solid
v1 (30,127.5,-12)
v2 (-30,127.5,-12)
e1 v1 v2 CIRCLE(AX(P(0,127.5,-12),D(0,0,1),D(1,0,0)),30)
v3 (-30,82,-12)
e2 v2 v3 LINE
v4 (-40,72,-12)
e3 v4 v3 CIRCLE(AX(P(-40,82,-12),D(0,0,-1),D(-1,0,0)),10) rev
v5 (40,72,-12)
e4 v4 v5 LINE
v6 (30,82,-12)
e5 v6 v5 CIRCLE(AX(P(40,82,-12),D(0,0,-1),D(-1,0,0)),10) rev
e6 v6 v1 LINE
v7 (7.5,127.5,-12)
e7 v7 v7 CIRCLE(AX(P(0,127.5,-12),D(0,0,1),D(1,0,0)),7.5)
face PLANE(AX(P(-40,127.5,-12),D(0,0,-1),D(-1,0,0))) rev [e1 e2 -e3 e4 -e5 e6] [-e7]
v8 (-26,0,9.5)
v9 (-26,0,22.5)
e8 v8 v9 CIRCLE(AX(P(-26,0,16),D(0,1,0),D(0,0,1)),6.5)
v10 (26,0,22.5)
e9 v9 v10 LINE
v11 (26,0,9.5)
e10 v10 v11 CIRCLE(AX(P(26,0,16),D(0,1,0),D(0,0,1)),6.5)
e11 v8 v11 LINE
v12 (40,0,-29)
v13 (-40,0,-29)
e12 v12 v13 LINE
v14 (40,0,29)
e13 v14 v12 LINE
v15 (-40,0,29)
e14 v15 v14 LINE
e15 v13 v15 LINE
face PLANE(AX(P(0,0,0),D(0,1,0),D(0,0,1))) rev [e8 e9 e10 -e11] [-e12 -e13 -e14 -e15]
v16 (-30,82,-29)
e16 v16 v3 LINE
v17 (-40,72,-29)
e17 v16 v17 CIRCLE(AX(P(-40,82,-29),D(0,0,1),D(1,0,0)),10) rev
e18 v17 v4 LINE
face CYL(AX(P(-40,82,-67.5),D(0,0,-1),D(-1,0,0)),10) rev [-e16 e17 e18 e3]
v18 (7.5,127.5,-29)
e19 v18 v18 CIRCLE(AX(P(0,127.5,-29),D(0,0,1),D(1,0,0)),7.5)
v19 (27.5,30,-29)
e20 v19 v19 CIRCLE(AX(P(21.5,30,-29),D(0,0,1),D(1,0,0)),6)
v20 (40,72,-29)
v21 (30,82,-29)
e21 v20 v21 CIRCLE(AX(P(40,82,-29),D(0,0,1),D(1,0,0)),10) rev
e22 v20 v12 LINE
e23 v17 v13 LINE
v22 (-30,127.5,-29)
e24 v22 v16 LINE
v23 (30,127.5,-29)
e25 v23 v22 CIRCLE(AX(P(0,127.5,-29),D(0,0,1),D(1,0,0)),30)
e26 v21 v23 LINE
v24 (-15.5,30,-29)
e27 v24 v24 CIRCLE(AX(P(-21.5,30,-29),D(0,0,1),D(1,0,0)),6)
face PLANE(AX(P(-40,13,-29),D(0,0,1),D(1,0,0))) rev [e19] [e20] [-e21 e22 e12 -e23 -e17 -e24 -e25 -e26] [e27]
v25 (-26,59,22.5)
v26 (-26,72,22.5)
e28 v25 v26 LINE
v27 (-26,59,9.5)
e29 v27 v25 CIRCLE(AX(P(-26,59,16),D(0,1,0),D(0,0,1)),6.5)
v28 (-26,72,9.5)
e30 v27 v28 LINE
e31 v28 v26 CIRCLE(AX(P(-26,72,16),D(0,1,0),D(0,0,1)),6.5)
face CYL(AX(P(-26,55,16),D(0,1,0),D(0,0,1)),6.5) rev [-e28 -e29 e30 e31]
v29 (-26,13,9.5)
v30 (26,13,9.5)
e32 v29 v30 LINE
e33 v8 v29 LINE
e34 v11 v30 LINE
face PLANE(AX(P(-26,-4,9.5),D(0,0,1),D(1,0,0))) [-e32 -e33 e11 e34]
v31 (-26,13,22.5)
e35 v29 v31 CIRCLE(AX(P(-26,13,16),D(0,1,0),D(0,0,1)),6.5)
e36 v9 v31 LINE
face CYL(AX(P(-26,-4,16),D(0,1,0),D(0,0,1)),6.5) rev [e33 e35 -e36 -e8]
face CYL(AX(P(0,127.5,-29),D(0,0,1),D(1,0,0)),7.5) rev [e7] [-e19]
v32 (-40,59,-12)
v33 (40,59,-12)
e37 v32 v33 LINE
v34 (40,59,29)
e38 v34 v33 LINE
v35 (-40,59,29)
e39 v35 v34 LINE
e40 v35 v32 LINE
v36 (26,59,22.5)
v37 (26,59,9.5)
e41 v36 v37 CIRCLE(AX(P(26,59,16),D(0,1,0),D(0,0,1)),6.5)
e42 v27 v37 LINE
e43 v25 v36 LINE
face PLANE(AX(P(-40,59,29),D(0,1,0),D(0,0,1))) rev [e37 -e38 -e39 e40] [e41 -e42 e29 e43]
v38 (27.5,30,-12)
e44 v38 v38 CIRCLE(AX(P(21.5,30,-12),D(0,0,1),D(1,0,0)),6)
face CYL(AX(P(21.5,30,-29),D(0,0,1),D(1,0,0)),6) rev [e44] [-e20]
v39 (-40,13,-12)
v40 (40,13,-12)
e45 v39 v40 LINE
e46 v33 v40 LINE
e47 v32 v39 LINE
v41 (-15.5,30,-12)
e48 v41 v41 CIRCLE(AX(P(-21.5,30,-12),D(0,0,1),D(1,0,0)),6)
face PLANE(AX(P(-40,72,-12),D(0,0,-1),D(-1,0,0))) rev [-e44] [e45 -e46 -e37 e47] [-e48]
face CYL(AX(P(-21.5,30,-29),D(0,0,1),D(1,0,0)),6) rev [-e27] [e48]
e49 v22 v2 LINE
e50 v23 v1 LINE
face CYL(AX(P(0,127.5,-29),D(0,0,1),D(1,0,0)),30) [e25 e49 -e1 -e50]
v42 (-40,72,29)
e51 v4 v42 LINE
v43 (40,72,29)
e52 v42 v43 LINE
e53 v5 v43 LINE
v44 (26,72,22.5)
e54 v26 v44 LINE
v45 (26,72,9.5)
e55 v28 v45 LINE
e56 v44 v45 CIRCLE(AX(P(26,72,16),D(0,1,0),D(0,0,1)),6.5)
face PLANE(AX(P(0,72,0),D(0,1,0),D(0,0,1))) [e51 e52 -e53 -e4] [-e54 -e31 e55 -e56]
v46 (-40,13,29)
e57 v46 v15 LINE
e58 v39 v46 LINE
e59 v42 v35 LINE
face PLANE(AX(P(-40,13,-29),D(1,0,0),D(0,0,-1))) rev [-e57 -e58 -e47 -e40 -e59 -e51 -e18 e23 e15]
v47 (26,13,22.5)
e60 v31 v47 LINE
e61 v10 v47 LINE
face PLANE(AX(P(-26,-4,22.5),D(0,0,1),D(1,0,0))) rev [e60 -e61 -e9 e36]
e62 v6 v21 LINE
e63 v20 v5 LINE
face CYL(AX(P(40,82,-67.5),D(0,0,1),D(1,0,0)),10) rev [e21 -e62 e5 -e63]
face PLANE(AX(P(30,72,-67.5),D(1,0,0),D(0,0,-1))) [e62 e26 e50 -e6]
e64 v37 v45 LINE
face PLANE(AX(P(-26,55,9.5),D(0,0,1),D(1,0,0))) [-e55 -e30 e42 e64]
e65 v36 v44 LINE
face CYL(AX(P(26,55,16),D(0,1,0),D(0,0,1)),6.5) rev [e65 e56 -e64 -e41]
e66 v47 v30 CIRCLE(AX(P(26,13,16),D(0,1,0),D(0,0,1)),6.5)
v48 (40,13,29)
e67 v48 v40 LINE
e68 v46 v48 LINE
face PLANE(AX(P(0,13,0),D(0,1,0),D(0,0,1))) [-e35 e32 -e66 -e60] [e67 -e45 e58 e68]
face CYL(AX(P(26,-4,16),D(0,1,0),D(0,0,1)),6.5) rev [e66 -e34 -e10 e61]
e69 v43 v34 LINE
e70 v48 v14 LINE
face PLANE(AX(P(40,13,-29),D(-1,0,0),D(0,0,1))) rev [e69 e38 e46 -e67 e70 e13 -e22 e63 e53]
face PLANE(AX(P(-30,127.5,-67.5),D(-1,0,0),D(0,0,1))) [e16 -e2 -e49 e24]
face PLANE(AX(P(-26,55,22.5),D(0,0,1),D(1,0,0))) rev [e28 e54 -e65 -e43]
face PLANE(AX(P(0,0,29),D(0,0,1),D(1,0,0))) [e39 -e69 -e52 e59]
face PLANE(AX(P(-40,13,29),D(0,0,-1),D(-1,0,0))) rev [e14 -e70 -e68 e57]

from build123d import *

# Parameters (mm, degrees)
SKETCH1_W           = 80
SKETCH1_H           = 58
BOSS_EXTRUDE1_DEPTH = 13
SKETCH2_W           = 80
SKETCH2_H           = 17
BOSS_EXTRUDE2_DEPTH = 59
SKETCH3_W           = 80
SKETCH3_H           = 13
BOSS_EXTRUDE3_DEPTH = 41
SKETCH4_W           = 80
SKETCH4_H           = 17
BOSS_EXTRUDE4_DEPTH = 55.5
SKETCH5_W           = 10
SKETCH5_H           = 55.5
CUT_EXTRUDE1_DEPTH  = 55.5
SKETCH7_W           = 10
SKETCH7_H           = 55.5
CUT_EXTRUDE2_DEPTH  = 55.5
SKETCH8_R           = 30
BOSS_EXTRUDE5_DEPTH = 17
SKETCH9_R           = 7.5
CUT_EXTRUDE3_DEPTH  = 17
FILLET1_R           = 10
FILLET2_R           = 10
CUT_EXTRUDE4_DEPTH  = 17
CUT_EXTRUDE5_DEPTH  = 17
SKETCH12_R          = 6
CUT_EXTRUDE6_DEPTH  = 17
SKETCH13_R          = 6
CUT_EXTRUDE7_DEPTH  = 17


with BuildPart() as part:
    # Sketch1 → Boss-Extrude1 (new body)
    with BuildSketch(Plane(origin=(0, 0, 0), x_dir=(1, 0, 0), z_dir=(0, 1, 0))):
        Rectangle(SKETCH1_W, SKETCH1_H)
    extrude(amount=BOSS_EXTRUDE1_DEPTH)

    # Sketch2 → Boss-Extrude2 (add)
    with BuildSketch(Plane(origin=(0, 13, 0), x_dir=(1, 0, 0), z_dir=(0, 1, 0))):
        with Locations((0, 20.5)):
            Rectangle(SKETCH2_W, SKETCH2_H)
    extrude(amount=BOSS_EXTRUDE2_DEPTH)

    # Sketch3 → Boss-Extrude3 (add)
    with BuildSketch(Plane.XY.offset(-12)):
        with Locations((0, 65.5)):
            Rectangle(SKETCH3_W, SKETCH3_H)
    extrude(amount=BOSS_EXTRUDE3_DEPTH)

    # Sketch4 → Boss-Extrude4 (add)
    with BuildSketch(Plane(origin=(0, 72, 0), x_dir=(1, 0, 0), z_dir=(0, 1, 0))):
        with Locations((0, 20.5)):
            Rectangle(SKETCH4_W, SKETCH4_H)
    extrude(amount=BOSS_EXTRUDE4_DEPTH)

    # Sketch5 → Cut-Extrude1 (cut)
    with BuildSketch(Plane.XY.offset(-12)):
        with Locations((-35, 99.75)):
            Rectangle(SKETCH5_W, SKETCH5_H)
    extrude(amount=-CUT_EXTRUDE1_DEPTH, mode=Mode.SUBTRACT)

    # Sketch7 → Cut-Extrude2 (cut)
    with BuildSketch(Plane.XY.offset(-12)):
        with Locations((35, 99.75)):
            Rectangle(SKETCH7_W, SKETCH7_H)
    extrude(amount=-CUT_EXTRUDE2_DEPTH, mode=Mode.SUBTRACT)

    # Sketch8 → Boss-Extrude5 (add)
    with BuildSketch(Plane.XY.offset(-12)):
        with Locations((0, 127.5)):
            Circle(SKETCH8_R)
    extrude(amount=-BOSS_EXTRUDE5_DEPTH)

    # Sketch9 → Cut-Extrude3 (cut)
    with BuildSketch(Plane.XY.offset(-12)):
        with Locations((0, 127.5)):
            Circle(SKETCH9_R)
    extrude(amount=-CUT_EXTRUDE3_DEPTH, mode=Mode.SUBTRACT)

    # Fillet1
    fillet1_edges = [part.edges().sort_by_distance(p)[0] for p in [
        (-30, 72, -20.5),
    ]]
    fillet(fillet1_edges, radius=FILLET1_R - 0.0001)  # a hair under: the kernel refuses the full size

    # Fillet2
    fillet2_edges = [part.edges().sort_by_distance(p)[0] for p in [
        (30, 72, -20.5),
    ]]
    fillet(fillet2_edges, radius=FILLET2_R - 0.0001)  # a hair under: the kernel refuses the full size

    # Sketch10 → Cut-Extrude4 (cut)
    with BuildSketch(Plane(origin=(0, 13, 0), x_dir=(1, 0, 0), z_dir=(0, 1, 0))):
        with BuildLine():
            Line((-26, -9.5), (26, -9.5))
            ThreePointArc((26, -9.5), (32.5, -16), (26, -22.5))
            Line((26, -22.5), (-26, -22.5))
            ThreePointArc((-26, -22.5), (-32.5, -16), (-26, -9.5))
        make_face()
    extrude(amount=-CUT_EXTRUDE4_DEPTH, mode=Mode.SUBTRACT)

    # Sketch11 → Cut-Extrude5 (cut)
    with BuildSketch(Plane(origin=(0, 72, 0), x_dir=(1, 0, 0), z_dir=(0, 1, 0))):
        with BuildLine():
            Line((-26, -9.5), (26, -9.5))
            ThreePointArc((26, -9.5), (32.5, -16), (26, -22.5))
            Line((26, -22.5), (-26, -22.5))
            ThreePointArc((-26, -22.5), (-32.5, -16), (-26, -9.5))
        make_face()
    extrude(amount=-CUT_EXTRUDE5_DEPTH, mode=Mode.SUBTRACT)

    # Sketch12 → Cut-Extrude6 (cut)
    with BuildSketch(Plane.XY.offset(-12)):
        with Locations((-21.5, 30)):
            Circle(SKETCH12_R)
    extrude(amount=-CUT_EXTRUDE6_DEPTH, mode=Mode.SUBTRACT)

    # Sketch13 → Cut-Extrude7 (cut)
    with BuildSketch(Plane.XY.offset(-12)):
        with Locations((21.5, 30)):
            Circle(SKETCH13_R)
    extrude(amount=-CUT_EXTRUDE7_DEPTH, mode=Mode.SUBTRACT)


solid = part.part
